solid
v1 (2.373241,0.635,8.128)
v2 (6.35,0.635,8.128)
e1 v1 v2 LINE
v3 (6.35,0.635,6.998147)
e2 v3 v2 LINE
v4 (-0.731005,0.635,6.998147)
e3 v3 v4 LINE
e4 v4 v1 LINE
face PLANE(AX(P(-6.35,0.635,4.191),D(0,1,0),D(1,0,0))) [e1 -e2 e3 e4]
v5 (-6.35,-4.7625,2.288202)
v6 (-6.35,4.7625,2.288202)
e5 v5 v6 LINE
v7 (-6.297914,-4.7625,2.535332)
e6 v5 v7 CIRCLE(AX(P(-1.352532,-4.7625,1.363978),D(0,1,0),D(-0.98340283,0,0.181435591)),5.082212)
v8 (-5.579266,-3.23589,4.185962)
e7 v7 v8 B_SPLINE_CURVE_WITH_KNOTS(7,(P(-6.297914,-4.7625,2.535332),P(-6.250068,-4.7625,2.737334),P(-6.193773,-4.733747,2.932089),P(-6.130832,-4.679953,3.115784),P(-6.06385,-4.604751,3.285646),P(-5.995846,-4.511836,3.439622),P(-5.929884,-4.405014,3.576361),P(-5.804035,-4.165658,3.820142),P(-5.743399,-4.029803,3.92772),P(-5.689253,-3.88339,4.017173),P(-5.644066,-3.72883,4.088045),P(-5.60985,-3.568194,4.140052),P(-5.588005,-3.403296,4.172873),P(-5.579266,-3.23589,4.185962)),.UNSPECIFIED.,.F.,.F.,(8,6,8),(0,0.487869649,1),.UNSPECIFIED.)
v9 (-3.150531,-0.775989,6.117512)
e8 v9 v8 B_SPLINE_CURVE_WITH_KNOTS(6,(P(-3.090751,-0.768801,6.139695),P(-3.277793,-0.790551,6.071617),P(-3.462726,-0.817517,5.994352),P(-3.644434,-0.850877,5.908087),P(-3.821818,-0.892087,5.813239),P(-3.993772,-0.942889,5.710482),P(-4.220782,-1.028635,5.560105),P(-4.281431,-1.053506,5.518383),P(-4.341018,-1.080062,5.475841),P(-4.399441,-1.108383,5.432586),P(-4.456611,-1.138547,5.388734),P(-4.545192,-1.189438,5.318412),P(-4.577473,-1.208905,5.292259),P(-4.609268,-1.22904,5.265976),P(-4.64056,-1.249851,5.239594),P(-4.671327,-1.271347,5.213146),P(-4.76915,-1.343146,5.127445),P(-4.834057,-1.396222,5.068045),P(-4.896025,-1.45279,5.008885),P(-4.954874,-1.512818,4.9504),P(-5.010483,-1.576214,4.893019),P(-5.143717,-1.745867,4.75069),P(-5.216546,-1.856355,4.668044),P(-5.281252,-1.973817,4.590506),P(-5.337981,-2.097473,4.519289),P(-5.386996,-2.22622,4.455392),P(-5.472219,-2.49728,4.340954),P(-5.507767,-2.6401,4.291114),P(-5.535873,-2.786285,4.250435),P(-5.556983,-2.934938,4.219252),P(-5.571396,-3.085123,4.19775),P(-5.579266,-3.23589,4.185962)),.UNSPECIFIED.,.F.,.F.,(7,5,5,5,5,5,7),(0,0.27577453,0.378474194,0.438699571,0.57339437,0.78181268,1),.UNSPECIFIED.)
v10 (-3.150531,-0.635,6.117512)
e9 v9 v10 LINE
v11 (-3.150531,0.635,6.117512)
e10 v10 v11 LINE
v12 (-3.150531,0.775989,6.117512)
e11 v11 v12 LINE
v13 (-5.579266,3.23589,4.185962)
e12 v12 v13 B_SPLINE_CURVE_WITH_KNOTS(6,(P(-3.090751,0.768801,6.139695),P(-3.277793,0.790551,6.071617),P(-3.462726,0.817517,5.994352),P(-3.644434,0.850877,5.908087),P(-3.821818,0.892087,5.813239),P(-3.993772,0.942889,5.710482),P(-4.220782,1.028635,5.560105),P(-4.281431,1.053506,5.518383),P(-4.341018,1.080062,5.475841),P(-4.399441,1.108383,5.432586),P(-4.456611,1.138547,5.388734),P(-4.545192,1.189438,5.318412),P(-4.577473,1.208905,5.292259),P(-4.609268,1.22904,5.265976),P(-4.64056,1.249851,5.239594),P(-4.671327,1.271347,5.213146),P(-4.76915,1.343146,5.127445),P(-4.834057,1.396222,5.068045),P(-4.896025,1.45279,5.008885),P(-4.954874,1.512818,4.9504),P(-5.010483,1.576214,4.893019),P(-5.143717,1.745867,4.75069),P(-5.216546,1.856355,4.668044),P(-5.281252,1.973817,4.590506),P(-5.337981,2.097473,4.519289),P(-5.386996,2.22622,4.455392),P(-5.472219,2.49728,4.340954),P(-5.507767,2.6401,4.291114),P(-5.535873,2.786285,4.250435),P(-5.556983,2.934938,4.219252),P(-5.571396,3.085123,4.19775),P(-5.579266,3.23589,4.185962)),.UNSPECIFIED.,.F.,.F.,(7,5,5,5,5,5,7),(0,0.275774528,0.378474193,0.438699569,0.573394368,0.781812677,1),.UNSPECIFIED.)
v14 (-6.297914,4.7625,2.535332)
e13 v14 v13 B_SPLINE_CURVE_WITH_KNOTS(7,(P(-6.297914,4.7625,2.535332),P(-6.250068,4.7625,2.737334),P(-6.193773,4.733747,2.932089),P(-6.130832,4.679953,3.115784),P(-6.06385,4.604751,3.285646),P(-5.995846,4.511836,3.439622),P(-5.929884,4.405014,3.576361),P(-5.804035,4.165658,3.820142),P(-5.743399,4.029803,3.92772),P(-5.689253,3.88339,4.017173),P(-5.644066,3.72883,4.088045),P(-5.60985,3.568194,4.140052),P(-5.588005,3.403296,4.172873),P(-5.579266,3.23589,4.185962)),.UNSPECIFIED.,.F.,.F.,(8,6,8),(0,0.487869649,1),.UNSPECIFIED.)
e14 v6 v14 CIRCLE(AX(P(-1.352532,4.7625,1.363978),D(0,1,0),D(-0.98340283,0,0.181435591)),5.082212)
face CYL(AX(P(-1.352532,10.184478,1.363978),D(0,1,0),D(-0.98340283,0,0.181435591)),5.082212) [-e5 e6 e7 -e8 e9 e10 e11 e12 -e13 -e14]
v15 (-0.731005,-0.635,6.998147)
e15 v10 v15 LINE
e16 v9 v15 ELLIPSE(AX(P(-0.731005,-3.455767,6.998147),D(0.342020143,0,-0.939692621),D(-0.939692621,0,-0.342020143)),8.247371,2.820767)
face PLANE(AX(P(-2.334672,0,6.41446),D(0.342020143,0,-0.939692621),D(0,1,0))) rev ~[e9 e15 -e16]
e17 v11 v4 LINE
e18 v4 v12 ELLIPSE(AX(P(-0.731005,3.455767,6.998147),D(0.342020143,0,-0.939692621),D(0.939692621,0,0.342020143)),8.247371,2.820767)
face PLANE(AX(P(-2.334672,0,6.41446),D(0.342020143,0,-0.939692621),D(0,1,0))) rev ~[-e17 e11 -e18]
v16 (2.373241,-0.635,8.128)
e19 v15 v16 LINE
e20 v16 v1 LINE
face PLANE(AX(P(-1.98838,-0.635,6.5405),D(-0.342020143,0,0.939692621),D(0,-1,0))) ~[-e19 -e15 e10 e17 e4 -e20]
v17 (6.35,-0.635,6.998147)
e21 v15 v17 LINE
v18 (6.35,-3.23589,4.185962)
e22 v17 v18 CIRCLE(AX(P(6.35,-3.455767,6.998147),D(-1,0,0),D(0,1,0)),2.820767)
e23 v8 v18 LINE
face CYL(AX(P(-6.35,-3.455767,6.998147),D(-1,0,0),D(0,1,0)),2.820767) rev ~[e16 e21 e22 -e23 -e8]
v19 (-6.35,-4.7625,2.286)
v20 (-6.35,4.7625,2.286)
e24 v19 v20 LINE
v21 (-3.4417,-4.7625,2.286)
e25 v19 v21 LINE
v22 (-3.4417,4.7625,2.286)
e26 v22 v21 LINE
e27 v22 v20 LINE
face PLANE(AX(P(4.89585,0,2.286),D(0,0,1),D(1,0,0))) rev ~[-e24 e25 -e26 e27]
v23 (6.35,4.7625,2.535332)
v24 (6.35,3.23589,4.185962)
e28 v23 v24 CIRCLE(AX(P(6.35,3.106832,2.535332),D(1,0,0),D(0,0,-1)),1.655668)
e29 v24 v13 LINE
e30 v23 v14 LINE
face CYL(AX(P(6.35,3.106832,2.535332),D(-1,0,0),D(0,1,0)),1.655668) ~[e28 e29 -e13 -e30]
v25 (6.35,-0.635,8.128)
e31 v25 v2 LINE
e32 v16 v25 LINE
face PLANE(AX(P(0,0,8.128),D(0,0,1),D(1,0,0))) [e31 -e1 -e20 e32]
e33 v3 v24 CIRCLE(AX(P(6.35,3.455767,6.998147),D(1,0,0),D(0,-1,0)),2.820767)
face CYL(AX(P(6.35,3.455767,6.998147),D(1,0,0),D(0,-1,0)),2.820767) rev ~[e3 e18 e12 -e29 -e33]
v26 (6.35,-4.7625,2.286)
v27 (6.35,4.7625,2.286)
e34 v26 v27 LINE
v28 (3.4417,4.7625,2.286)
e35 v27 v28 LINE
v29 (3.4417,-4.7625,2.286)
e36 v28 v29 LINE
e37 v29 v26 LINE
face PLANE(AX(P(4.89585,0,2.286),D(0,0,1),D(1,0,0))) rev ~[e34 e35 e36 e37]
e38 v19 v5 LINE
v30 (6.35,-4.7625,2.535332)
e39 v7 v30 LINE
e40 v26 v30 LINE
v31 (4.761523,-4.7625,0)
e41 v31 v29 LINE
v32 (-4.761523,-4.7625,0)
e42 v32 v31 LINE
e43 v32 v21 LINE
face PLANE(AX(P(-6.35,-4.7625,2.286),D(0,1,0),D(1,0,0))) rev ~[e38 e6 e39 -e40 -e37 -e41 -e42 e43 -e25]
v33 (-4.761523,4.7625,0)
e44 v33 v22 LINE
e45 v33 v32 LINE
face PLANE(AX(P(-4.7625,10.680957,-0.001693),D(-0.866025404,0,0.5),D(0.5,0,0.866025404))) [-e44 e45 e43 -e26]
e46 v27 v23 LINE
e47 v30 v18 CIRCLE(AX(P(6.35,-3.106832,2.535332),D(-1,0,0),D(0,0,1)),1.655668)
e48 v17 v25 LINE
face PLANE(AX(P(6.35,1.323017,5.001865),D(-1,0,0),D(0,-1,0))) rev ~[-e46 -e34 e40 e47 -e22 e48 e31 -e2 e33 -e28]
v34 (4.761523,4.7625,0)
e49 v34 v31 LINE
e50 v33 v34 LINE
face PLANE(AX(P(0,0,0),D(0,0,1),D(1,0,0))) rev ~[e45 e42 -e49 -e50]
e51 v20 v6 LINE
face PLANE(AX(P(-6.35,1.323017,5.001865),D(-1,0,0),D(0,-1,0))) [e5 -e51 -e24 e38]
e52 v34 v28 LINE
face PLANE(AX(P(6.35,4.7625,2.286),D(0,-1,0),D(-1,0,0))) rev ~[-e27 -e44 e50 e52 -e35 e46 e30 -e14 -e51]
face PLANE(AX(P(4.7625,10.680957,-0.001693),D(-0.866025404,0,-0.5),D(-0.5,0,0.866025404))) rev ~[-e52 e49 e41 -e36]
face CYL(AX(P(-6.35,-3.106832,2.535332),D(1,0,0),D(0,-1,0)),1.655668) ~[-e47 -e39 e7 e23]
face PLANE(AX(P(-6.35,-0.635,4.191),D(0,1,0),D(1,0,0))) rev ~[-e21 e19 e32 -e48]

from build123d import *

# Parameters (mm, degrees)
F0_W         = 9.525
F0_H         = 9.525
F1_DEPTH     = 2.286
F2_T1_DEPTH  = 21.3619144247
F3_W         = 2.9083
F3_H         = 9.525
F3_W_2       = 6.8834
F4_DEPTH     = 1.905
F5_R         = 1.6556676611
F6_W         = 12.7
F6_H         = 1.27
F7_DEPTH     = 3.937
F8_SIZE2     = 8.7232408068
F8_SIZE      = 3.175
F9_T4_DEPTH  = 12.7
F9_T9_DEPTH  = 12.7
F10_T1_DEPTH = 20.3689561099


# Not quite as in the source:
# - a fillet or chamfer that OpenCascade refuses, or shapes differently, is made with other operations: its cross-section is extruded or revolved along the edge and cut away or added


with BuildPart() as f1:
    # F0 (on Top) → F1 (new body)
    with BuildSketch(Plane.XY):
        Rectangle(F0_W, F0_H)
    extrude(amount=F1_DEPTH)

    # F2: chamfer of 1.3208 x 2.2876927066 on 2 edges, made by hand

    # F2_s2 → F2_t1 (cut)
    with BuildSketch(Plane.XZ.offset(-10.6809572123)):
        Polygon((-4.7625, -0.0016927066), (-3.4417, 2.286), (-4.7625, 2.286), align=None)
        Polygon((4.7625, -0.0016927066), (3.4417, 2.286), (4.7625, 2.286), align=None)
    extrude(amount=F2_T1_DEPTH, mode=Mode.SUBTRACT)

    # F3 (on face) → F4 (join)
    with BuildSketch(Plane.XY.offset(2.286)):
        with Locations((4.89585, 0)):
            Rectangle(F3_W, F3_H)
        Rectangle(F3_W_2, F3_H)
        with Locations((-4.89585, 0)):
            Rectangle(F3_W, F3_H)
    extrude(amount=F4_DEPTH)

    # F5
    f5_edges = [f1.edges().sort_by_distance(p)[0] for p in [
        (0, 4.7625, 4.191),
        (0, -4.7625, 4.191),
    ]]
    fillet(f5_edges, radius=F5_R)

    # F6 (on face) → F7 (join)
    with BuildSketch(Plane.XY.offset(4.191)):
        Rectangle(F6_W, F6_H)
    extrude(amount=F7_DEPTH)

    # F8
    f8_edges = [f1.edges().sort_by_distance(p)[0] for p in [
        (-6.35, 0, 8.128),
    ]]
    f8_side = f1.faces().sort_by_distance((-6.35, 0, 3.872106))[0]
    chamfer(f8_edges, length=F8_SIZE, length2=F8_SIZE2, reference=f8_side)

    # F9: fillet of radius 2.8207671263 on 2 edges, made by hand


with BuildPart() as f9_tool2:
    # F9_s3 → F9_t4 (new body)
    with BuildSketch(Plane.YZ.offset(-6.35)):
        with BuildLine():
            ThreePointArc((-0.635, 6.9981468006), (-1.3849039981, 5.0828783899), (-3.235890411, 4.1859623453))
            Line((-3.235890411, 4.1859623453), (-3.2139027394, 3.9047438998))
            ThreePointArc((-3.2139027394, 3.9047438998), (-3.1068323389, 3.9089232874), (-0.635, 3.9089232874))
            Line((-0.635, 3.9089232874), (-0.3529232874, 4.191))
            Line((-0.3529232874, 4.191), (-0.3529232874, 6.9981468006))
            Line((-0.3529232874, 6.9981468006), (-0.635, 6.9981468006))
        make_face()
    extrude(amount=F9_T4_DEPTH)

    split(bisect_by=Plane(origin=(-2.3346724085, 0, 6.4144597241), x_dir=(0, 1, 0), z_dir=(0.3420201433, 0, -0.9396926208)), keep=Keep.TOP)


with BuildPart() as f1_1:
    add(f1.part)

    # F9_t1: union F9_tool2
    add(f9_tool2.part)


with BuildPart() as f9_tool7:
    # F9_s8 → F9_t9 (new body)
    with BuildSketch(Plane.YZ.offset(6.35)):
        with BuildLine():
            ThreePointArc((0.635, 6.9981468006), (1.3849039981, 5.0828783899), (3.235890411, 4.1859623453))
            Line((3.235890411, 4.1859623453), (3.2139027394, 3.9047438998))
            ThreePointArc((3.2139027394, 3.9047438998), (3.1068323389, 3.9089232874), (0.635, 3.9089232874))
            Line((0.635, 3.9089232874), (0.3529232874, 4.191))
            Line((0.3529232874, 4.191), (0.3529232874, 6.9981468006))
            Line((0.3529232874, 6.9981468006), (0.635, 6.9981468006))
        make_face()
    extrude(amount=-F9_T9_DEPTH)

    split(bisect_by=Plane(origin=(-2.3346724085, 0, 6.4144597241), x_dir=(0, 1, 0), z_dir=(0.3420201433, 0, -0.9396926208)), keep=Keep.TOP)


with BuildPart() as f1_2:
    add(f1_1.part)

    # F9_t6: union F9_tool7
    add(f9_tool7.part)

    # F10: fillet of radius 5.08 on 1 edges, made by hand

    # F10_s2 → F10_t1 (cut)
    with BuildSketch(Plane.XZ.offset(-10.184478055)):
        with BuildLine():
            ThreePointArc((-6.3503933611, 2.2860725742), (-5.2327762913, 4.646139378), (-3.0907506998, 6.1396954024))
            Line((-3.0907506998, 6.1396954024), (-3.2645725807, 6.6172670953))
            ThreePointArc((-3.2645725807, 6.6172670953), (-4.8941288268, 6.0237314555), (-6.5238218809, 5.4305716928))
            Line((-6.5238218809, 5.4305716928), (-6.8582211803, 4.953))
            ThreePointArc((-6.8582211803, 4.953), (-6.8582211803, 3.6195362871), (-6.8501795082, 2.3782819842))
            Line((-6.8501795082, 2.3782819842), (-6.3503933611, 2.2860725742))
        make_face()
    extrude(amount=F10_T1_DEPTH, mode=Mode.SUBTRACT)


solid = f1_2.part
